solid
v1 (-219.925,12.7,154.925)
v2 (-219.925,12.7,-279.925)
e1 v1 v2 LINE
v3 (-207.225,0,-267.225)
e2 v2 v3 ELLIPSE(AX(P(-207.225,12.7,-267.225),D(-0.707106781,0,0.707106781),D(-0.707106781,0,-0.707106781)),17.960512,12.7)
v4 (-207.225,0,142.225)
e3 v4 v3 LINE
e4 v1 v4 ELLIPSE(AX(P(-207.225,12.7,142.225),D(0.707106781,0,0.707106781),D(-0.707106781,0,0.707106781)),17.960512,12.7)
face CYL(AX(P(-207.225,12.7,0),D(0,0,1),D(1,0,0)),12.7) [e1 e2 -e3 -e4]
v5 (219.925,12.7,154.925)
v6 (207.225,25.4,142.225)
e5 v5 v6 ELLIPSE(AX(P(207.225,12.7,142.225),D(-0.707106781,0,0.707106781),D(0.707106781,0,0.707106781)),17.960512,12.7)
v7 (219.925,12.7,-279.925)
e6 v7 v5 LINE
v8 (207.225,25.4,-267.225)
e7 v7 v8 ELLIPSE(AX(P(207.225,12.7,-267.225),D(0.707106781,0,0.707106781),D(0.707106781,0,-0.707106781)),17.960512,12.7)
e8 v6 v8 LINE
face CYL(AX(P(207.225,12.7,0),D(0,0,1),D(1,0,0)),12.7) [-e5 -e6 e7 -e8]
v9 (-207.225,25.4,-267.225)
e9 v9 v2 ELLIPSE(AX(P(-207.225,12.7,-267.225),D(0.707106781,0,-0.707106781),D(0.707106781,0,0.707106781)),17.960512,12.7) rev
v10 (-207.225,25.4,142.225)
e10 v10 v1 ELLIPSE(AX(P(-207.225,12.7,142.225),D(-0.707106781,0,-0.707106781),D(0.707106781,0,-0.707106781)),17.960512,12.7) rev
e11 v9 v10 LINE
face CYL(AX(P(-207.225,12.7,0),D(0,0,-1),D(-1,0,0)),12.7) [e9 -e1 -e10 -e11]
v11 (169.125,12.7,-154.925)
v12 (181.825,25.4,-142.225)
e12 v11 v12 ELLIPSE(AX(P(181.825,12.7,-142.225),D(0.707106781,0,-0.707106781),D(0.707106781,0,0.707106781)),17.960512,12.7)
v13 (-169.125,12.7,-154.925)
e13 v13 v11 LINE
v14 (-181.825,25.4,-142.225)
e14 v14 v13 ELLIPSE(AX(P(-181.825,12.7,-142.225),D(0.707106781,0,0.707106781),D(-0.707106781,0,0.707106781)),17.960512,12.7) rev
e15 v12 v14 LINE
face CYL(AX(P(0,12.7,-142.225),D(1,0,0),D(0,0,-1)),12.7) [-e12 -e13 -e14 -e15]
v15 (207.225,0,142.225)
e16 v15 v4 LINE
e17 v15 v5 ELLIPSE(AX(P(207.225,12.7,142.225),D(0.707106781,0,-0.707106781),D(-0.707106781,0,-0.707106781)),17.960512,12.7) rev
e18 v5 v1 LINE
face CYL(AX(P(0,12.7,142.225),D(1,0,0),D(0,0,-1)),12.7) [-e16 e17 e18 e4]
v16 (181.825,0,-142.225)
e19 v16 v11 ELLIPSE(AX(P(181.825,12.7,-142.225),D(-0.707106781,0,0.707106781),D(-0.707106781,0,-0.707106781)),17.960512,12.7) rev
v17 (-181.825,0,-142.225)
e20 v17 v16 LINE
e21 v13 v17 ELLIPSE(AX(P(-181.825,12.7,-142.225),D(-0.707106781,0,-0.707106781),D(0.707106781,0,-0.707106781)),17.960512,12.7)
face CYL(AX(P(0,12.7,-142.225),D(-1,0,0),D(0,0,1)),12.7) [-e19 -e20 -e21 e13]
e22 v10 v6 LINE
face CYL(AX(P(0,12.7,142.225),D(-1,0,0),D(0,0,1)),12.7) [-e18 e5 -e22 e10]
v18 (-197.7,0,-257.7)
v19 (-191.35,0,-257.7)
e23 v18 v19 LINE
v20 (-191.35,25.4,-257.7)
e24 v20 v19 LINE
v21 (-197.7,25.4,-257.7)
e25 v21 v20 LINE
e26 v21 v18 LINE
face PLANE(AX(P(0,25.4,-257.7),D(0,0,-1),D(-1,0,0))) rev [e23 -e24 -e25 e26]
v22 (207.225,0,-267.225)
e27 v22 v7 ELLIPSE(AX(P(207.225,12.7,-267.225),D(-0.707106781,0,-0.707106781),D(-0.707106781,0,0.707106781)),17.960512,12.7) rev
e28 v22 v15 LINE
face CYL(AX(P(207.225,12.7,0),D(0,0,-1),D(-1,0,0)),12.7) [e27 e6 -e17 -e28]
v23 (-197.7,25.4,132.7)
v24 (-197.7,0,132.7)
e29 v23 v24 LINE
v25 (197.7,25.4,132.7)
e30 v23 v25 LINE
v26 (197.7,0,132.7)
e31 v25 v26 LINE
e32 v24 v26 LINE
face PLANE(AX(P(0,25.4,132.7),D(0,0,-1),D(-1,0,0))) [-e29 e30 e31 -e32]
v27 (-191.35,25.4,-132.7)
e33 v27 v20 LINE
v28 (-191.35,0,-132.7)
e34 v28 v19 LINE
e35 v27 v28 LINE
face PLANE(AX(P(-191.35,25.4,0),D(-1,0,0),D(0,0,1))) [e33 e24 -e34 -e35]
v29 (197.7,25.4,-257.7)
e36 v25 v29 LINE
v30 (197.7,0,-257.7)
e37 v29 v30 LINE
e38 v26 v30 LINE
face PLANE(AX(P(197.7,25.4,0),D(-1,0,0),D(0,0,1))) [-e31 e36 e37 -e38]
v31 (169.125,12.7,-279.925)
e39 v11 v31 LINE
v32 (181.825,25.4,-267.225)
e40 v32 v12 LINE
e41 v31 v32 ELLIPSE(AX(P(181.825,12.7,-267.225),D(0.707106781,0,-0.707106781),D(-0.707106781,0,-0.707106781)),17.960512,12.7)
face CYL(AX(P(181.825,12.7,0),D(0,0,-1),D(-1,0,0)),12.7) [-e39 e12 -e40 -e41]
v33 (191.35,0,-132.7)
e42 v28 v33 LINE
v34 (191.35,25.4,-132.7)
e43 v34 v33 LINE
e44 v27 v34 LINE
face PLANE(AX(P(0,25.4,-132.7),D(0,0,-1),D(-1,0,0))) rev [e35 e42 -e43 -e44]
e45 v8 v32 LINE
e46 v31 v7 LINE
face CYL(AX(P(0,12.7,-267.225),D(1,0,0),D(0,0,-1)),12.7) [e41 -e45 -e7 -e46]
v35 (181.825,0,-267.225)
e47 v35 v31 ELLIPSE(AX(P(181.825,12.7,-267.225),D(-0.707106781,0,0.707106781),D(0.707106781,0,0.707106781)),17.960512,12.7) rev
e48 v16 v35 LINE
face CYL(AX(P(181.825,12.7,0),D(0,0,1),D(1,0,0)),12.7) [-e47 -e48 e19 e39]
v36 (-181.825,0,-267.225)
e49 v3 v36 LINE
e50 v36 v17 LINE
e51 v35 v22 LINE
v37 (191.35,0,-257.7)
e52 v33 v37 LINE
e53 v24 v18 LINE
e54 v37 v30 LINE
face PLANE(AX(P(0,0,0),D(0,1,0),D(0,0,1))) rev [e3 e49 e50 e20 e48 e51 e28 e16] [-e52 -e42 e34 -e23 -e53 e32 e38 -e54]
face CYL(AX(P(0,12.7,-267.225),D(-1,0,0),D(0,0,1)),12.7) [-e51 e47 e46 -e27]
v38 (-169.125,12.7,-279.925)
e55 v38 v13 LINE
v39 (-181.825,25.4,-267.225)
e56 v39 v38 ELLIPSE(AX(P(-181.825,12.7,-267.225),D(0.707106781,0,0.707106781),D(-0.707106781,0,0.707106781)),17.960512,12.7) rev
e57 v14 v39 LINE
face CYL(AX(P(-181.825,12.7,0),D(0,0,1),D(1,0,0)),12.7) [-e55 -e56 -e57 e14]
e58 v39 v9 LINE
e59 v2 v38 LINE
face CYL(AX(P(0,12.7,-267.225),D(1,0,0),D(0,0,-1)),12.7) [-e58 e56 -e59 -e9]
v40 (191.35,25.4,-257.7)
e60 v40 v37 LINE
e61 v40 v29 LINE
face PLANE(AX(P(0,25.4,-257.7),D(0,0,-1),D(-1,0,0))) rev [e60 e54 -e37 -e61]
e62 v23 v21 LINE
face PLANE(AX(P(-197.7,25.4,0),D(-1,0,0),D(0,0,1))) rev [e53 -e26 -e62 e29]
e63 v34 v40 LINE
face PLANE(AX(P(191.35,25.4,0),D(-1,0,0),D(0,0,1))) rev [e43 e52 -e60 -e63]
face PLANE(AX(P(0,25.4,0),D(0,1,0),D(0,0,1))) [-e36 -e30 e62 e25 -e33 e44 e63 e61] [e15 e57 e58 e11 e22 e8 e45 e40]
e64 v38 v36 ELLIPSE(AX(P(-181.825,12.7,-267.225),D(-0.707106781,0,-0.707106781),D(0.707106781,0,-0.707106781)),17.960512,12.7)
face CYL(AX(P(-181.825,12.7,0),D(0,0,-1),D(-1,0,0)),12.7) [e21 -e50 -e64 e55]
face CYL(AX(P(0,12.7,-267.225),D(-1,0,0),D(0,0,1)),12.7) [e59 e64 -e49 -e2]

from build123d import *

# Parameters (mm, degrees)
BOSS_EXTRUDE1_DEPTH = 25.4
FILLET1_R           = 12.7


with BuildPart() as part:
    # Sketch2 → Boss-Extrude1 (new body)
    with BuildSketch(Plane(origin=(0, 0, 0), x_dir=(1, 0, 0), z_dir=(0, 1, 0))):
        Polygon((-219.925, -154.925), (219.925, -154.925), (219.925, 132.7), (219.925, 279.925000096), (169.125, 279.925000096), (169.125, 154.925), (-169.125, 154.925), (-169.125, 279.925000096), (-219.925, 279.925000096), (-219.925, 132.7), align=None)
        Polygon((-191.35, 132.7), (-191.35, 257.700000096), (-197.7, 257.700000096), (-197.7, 132.7), (-197.7, -132.7), (197.7, -132.7), (197.7, 132.7), (197.7, 257.700000096), (191.35, 257.700000096), (191.35, 132.7), align=None, mode=Mode.SUBTRACT)
    extrude(amount=BOSS_EXTRUDE1_DEPTH)

    # Fillet1
    fillet1_edges = [part.edges().sort_by_distance(p)[0] for p in [
        (0, 0, 154.925),
        (0, 25.4, 154.925),
        (-219.925, 0, -62.500000048),
        (-194.525, 0, -279.925000096),
        (-219.925, 25.4, -62.500000048),
        (-194.525, 25.4, -279.925000096),
        (-169.125, 0, -217.425000048),
        (-169.125, 25.4, -217.425000048),
        (0, 0, -154.925),
        (0, 25.4, -154.925),
        (219.925, 0, -62.500000048),
        (219.925, 25.4, -62.500000048),
        (194.525, 0, -279.925000096),
        (194.525, 25.4, -279.925000096),
        (169.125, 0, -217.425000048),
        (169.125, 25.4, -217.425000048),
    ]]
    fillet(fillet1_edges, radius=FILLET1_R - 0.0001)  # a hair under: the kernel refuses the full size


solid = part.part
